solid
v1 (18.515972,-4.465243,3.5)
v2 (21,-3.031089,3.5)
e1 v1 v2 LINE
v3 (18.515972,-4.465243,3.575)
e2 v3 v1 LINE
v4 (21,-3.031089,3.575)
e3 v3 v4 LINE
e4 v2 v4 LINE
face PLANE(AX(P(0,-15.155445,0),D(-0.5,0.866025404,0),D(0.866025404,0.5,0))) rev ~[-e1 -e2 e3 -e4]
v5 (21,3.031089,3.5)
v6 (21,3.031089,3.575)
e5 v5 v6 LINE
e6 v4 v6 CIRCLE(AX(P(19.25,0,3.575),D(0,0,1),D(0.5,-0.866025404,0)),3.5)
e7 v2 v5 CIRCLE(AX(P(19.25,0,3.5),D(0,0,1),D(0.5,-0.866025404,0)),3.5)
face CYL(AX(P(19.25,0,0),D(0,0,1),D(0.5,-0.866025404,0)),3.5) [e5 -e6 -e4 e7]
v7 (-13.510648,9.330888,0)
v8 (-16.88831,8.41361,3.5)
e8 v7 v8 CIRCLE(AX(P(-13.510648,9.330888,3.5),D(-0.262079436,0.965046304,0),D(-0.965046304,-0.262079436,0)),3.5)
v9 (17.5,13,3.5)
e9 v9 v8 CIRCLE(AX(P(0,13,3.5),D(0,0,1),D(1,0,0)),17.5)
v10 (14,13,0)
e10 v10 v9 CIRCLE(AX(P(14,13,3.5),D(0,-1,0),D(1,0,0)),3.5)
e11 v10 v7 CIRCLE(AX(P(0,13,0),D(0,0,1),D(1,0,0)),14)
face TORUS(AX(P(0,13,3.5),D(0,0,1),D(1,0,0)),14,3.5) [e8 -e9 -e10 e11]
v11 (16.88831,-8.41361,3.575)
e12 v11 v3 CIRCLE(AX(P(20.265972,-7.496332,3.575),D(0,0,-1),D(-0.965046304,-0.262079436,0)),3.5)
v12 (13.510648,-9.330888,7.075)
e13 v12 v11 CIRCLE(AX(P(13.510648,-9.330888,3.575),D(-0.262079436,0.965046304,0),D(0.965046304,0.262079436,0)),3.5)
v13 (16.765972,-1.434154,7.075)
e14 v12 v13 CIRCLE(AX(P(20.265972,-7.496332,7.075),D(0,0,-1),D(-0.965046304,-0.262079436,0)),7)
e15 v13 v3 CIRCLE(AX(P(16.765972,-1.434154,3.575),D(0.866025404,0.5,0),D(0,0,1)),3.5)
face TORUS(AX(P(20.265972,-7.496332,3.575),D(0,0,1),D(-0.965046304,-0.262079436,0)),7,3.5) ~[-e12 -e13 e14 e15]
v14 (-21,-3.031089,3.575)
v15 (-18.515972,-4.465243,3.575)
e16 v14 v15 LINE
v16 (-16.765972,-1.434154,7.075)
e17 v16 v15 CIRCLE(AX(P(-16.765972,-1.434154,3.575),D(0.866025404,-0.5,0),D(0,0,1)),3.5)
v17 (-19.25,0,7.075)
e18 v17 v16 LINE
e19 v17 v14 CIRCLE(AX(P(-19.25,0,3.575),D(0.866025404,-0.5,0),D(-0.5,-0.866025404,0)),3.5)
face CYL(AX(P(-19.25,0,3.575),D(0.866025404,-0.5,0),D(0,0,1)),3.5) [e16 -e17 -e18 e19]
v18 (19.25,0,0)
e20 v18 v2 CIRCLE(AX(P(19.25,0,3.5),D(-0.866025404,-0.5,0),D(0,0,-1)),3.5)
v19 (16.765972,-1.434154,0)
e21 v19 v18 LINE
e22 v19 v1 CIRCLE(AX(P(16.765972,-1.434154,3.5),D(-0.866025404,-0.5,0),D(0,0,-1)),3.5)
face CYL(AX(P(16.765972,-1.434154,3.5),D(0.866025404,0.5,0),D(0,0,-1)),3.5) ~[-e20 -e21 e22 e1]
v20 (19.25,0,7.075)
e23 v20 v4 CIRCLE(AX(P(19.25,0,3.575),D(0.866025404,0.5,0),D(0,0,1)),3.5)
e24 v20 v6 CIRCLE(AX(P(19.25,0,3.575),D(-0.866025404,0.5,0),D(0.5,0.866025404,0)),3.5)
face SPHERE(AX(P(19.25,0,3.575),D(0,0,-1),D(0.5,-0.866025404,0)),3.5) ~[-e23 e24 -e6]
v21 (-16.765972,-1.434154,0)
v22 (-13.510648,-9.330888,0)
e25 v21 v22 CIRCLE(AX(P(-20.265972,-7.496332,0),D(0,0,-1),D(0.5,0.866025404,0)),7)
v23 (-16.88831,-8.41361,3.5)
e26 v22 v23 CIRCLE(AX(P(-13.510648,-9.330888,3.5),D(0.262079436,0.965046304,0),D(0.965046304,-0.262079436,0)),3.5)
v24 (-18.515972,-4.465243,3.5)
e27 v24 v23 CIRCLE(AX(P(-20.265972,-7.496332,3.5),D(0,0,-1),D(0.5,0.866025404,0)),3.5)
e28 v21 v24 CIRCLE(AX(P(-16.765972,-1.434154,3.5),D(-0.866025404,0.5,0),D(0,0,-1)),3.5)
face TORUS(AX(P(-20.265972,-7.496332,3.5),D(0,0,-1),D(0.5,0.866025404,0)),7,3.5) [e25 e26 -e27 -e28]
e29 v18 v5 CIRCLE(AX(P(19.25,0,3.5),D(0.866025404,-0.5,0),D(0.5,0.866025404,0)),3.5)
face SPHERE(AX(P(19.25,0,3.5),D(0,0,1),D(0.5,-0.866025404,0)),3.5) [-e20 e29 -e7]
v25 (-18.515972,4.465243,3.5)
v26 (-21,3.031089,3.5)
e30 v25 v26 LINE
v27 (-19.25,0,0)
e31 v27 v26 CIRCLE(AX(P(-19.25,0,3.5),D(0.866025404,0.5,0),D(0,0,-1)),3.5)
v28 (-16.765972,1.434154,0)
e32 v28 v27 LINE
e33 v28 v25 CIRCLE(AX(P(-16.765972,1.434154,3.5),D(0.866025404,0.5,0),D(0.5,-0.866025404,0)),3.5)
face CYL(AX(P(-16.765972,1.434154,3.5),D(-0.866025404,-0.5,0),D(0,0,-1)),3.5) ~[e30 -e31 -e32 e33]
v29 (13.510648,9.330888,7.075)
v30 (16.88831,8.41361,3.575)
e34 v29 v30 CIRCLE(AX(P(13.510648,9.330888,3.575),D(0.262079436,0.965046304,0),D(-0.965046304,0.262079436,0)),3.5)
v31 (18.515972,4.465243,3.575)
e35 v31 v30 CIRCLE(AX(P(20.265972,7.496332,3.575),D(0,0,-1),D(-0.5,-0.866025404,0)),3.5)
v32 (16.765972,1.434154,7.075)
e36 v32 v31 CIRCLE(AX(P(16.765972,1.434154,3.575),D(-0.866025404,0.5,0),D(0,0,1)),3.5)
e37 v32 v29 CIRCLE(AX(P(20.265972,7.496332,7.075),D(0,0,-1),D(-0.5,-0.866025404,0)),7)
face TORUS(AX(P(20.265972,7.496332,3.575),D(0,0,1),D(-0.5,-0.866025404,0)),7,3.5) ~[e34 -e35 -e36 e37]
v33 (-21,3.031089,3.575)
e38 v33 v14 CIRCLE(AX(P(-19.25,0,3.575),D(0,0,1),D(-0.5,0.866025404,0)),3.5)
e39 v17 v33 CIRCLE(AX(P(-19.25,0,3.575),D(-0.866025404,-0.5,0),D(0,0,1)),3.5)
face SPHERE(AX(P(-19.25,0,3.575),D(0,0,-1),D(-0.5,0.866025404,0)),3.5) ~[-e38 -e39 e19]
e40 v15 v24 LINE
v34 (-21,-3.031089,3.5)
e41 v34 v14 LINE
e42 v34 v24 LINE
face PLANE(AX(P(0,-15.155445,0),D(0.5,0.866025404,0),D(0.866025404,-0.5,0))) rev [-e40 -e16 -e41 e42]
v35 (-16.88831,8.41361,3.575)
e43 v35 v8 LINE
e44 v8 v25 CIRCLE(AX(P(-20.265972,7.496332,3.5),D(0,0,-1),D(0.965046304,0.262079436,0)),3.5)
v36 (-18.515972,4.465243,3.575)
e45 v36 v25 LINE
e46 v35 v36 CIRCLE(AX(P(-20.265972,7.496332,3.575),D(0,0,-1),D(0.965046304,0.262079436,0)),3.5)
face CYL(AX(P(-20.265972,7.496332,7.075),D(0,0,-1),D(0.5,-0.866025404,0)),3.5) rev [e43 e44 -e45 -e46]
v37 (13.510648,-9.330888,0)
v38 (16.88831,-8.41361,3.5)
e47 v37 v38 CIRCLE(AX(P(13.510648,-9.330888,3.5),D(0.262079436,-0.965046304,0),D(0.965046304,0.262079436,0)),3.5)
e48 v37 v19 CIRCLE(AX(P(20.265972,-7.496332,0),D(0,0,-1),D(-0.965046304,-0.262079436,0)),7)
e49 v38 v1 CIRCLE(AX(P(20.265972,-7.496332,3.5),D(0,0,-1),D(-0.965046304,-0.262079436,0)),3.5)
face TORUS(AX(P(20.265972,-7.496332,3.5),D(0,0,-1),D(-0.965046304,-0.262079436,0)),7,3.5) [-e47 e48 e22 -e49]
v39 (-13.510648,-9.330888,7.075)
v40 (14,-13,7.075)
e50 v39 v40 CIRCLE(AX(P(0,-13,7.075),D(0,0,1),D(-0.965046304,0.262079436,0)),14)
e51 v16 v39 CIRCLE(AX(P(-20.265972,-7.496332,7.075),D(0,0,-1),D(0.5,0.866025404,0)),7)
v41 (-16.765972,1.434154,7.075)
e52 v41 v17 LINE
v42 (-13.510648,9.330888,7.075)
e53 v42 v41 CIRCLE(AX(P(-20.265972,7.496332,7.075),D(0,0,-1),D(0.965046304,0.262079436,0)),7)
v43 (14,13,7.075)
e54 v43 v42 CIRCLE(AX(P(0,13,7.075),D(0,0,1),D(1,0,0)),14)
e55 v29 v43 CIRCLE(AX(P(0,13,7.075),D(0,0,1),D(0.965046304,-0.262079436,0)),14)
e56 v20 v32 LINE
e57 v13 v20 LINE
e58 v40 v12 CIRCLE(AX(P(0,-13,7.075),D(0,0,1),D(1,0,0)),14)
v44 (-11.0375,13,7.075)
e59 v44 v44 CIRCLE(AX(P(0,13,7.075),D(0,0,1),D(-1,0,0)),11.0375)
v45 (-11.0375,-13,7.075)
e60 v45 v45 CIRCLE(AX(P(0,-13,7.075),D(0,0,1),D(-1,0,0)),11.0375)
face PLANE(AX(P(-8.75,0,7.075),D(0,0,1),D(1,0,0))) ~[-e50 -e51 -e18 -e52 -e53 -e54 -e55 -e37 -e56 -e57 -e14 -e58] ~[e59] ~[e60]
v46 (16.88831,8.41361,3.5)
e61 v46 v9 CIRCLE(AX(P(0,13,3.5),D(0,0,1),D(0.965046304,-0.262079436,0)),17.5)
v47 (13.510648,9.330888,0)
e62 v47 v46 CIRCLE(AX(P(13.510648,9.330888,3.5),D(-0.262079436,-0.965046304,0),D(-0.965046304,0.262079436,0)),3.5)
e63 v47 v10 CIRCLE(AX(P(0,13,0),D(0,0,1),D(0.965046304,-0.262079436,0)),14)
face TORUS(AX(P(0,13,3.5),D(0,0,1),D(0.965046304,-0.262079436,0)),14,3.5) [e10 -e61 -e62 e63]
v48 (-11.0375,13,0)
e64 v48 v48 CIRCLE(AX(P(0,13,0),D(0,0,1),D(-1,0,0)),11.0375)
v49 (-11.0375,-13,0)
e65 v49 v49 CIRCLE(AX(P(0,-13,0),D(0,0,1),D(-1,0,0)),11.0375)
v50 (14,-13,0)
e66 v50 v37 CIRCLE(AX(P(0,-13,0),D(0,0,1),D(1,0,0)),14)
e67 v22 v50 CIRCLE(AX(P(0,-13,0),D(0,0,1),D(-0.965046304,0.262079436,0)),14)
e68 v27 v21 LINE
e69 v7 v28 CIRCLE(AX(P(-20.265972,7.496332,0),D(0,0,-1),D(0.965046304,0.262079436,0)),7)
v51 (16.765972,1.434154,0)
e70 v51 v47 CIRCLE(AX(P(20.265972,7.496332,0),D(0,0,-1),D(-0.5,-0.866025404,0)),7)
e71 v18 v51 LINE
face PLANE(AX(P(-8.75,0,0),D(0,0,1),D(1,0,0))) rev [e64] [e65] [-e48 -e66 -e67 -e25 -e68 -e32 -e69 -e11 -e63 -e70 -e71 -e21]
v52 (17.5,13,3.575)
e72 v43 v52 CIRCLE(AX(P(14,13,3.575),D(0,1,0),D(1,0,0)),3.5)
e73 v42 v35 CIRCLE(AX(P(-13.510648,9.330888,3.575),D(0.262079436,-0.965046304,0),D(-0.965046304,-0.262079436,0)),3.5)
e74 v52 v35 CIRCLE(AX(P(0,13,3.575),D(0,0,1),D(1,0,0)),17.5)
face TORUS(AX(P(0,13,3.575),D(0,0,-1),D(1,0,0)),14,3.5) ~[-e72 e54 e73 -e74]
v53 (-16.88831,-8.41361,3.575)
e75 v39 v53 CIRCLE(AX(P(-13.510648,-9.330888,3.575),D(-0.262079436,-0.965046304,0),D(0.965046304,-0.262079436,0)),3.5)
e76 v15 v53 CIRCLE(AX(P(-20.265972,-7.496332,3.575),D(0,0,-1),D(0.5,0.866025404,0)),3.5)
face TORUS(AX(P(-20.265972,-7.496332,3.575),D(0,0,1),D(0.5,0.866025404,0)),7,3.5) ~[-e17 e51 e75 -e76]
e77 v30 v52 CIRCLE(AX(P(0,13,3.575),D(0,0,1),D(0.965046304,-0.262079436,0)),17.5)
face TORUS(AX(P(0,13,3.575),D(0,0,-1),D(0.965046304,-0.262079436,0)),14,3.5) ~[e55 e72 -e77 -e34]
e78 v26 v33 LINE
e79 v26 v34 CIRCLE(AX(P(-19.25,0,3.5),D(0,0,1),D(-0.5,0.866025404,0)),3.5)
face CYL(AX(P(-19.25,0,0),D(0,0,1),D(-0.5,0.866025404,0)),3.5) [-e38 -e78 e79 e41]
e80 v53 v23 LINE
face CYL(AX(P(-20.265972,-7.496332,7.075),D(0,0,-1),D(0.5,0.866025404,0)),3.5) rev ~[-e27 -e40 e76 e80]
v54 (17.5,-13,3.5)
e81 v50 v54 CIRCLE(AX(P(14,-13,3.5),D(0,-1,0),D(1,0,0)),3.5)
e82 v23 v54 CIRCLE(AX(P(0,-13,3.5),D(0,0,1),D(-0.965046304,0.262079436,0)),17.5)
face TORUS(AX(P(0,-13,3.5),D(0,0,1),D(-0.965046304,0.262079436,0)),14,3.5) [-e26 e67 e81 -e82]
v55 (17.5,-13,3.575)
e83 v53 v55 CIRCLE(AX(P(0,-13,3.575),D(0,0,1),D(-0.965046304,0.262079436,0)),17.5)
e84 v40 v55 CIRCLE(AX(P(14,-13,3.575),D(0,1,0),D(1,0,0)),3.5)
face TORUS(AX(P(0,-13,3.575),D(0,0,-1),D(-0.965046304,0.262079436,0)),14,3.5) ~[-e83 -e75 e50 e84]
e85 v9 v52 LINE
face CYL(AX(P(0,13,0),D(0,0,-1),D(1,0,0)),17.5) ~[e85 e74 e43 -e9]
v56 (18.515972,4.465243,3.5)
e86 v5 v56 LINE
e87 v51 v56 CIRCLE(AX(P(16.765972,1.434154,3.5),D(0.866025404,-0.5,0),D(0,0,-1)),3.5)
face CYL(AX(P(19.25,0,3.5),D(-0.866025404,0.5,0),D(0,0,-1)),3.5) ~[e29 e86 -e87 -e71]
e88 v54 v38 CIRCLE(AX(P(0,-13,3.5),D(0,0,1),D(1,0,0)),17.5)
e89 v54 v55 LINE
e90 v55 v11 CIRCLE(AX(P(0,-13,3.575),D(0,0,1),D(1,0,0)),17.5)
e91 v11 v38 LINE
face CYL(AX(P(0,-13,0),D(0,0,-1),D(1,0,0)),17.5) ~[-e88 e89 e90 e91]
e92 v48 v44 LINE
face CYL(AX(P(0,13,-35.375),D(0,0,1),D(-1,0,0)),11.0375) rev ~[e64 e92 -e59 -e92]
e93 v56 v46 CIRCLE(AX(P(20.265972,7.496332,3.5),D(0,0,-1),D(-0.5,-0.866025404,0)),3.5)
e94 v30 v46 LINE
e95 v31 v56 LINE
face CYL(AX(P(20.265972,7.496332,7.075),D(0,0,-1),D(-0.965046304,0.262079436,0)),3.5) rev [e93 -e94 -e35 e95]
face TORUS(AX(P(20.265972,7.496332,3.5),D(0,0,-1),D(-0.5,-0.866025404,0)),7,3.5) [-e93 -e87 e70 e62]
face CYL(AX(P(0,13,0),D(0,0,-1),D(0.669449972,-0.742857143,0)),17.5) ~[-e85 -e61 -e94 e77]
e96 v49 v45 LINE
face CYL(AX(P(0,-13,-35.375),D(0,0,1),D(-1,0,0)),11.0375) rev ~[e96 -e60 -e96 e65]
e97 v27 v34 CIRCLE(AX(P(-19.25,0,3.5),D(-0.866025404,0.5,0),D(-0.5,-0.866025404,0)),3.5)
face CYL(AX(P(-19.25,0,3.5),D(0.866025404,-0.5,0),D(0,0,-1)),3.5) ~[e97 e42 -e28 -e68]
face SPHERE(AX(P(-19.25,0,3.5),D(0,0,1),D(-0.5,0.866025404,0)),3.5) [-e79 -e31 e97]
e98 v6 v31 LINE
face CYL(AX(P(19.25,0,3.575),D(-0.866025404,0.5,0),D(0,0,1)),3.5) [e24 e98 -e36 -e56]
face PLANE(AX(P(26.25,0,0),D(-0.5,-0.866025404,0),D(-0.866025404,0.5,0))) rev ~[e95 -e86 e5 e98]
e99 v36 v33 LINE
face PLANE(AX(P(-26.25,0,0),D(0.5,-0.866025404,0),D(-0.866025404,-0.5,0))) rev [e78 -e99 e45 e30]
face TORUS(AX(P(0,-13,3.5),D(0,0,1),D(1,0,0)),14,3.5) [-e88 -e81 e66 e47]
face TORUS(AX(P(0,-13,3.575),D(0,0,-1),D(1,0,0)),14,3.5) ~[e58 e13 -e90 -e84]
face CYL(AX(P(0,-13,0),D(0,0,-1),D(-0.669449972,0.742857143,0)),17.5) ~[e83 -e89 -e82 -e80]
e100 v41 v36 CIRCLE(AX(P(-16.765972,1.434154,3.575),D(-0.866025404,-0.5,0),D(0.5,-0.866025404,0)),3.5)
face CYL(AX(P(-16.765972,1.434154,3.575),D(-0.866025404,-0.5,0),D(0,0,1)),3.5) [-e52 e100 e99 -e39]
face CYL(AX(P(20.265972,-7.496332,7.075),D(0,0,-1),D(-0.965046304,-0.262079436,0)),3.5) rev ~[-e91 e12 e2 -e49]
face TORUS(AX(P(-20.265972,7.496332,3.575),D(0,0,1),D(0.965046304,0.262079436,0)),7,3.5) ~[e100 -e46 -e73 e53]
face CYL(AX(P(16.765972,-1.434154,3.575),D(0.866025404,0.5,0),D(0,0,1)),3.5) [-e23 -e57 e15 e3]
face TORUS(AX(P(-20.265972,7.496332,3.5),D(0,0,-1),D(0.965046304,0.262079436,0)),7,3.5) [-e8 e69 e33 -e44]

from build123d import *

# Parameters (mm, degrees)
F1_DEPTH = 7.075
F3_DEPTH = 7.075
F4_D     = 22.075
F4_DEPTH = 35.375
F4_TIP   = 6.6319990825
F5_F1_R  = 3.5
F5_F2_R  = 3.5
F5_F3_R  = 3.5


# Not quite as in the source:
# - a pattern or mirror of a feature is missing from the dataset's text; its kind, count and spacing are read off the source's solid


with BuildPart() as f1:
    # F0 (on Top) → F1 (new body)
    with BuildSketch(Plane.XY):
        with BuildLine():
            ThreePointArc((11.7153745139, 0), (15.9885748895, 5.8855447852), (17.5, 13))
            ThreePointArc((17.5, 13), (-7.1144552148, 28.9885748895), (-11.7153745139, 0))
            ThreePointArc((-11.7153745139, 0), (0, 4.5), (11.7153745139, 0))
        make_face()
        with BuildLine():
            ThreePointArc((11.7153745139, 0), (0, -4.5), (-11.7153745139, 0))
            ThreePointArc((-11.7153745139, 0), (-7.1144552148, -28.9885748895), (17.5, -13))
            ThreePointArc((17.5, -13), (15.9885748895, -5.8855447852), (11.7153745139, 0))
        make_face()
        with BuildLine():
            ThreePointArc((11.7153745139, 0), (0, 4.5), (-11.7153745139, 0))
            ThreePointArc((-11.7153745139, 0), (0, -4.5), (11.7153745139, 0))
        make_face()
    extrude(amount=F1_DEPTH)

    # F2 (on Top) → F3 (join)
    with BuildSketch(Plane.XY):
        Polygon((26.25, 0), (0, 15.1554445662), (0, -15.1554445662), align=None)
    f3 = extrude(amount=F3_DEPTH)

    # F3_copies: F3 across plane
    add(f3.mirror(Plane(origin=(0, 0, 0), x_dir=(0, 0, -1), z_dir=(-1, 0, 0))))

    # F4
    with Locations(Plane(origin=(0, 0, 0), x_dir=(1, 0, 0), z_dir=(0, 0, -1))):
        with Locations((0, -13), (0, 13)):
            Hole(F4_D / 2, depth=F4_DEPTH)
            with Locations((0, 0, -(F4_DEPTH + F4_TIP / 2))):  # 118° drill point
                Cone(0, F4_D / 2, F4_TIP, mode=Mode.SUBTRACT)

    # F5: fillet of radius 3.5 on 14 edges, made by hand

    # F5_f1
    f5_f1_edges = [f1.edges().sort_by_distance(p)[0] for p in [
        (16.0023148685, -5.9165037693, 3.5375),
        (-16.0023148685, 5.9165037693, 3.5375),
        (16.0023148685, 5.9165037693, 3.5375),
        (-16.0023148685, -5.9165037693, 3.5375),
    ]]
    fillet(f5_f1_edges, radius=F5_F1_R)

    # F5_f2
    f5_f2_edges = [f1.edges().sort_by_distance(p)[0] for p in [
        (26.25, 0, 3.5375),
        (-26.25, 0, 3.5375),
    ]]
    fillet(f5_f2_edges, radius=F5_F2_R)

    # F5_f3
    f5_f3_edges = [f1.edges().sort_by_distance(p)[0] for p in [
        (19.7579861931, -3.748165919, 0),
        (19.7579861931, -3.748165919, 7.075),
        (0, 30.5, 0),
        (0, 30.5, 7.075),
        (0, -30.5, 0),
        (0, -30.5, 7.075),
        (19.7579861931, 3.748165919, 0),
        (19.7579861931, 3.748165919, 7.075),
        (22.75, 0, 7.075),
        (17.03013711, 6.1624015307, 7.075),
        (22.75, 0, 0),
        (17.03013711, 6.1624015307, 0),
        (-17.03013711, -6.1624015307, 7.075),
        (17.03013711, -6.1624015307, 7.075),
        (-17.03013711, -6.1624015307, 0),
        (17.03013711, -6.1624015307, 0),
        (-17.03013711, 6.1624015307, 7.075),
        (-17.03013711, 6.1624015307, 0),
    ]]
    fillet(f5_f3_edges, radius=F5_F3_R)


solid = f1.part
